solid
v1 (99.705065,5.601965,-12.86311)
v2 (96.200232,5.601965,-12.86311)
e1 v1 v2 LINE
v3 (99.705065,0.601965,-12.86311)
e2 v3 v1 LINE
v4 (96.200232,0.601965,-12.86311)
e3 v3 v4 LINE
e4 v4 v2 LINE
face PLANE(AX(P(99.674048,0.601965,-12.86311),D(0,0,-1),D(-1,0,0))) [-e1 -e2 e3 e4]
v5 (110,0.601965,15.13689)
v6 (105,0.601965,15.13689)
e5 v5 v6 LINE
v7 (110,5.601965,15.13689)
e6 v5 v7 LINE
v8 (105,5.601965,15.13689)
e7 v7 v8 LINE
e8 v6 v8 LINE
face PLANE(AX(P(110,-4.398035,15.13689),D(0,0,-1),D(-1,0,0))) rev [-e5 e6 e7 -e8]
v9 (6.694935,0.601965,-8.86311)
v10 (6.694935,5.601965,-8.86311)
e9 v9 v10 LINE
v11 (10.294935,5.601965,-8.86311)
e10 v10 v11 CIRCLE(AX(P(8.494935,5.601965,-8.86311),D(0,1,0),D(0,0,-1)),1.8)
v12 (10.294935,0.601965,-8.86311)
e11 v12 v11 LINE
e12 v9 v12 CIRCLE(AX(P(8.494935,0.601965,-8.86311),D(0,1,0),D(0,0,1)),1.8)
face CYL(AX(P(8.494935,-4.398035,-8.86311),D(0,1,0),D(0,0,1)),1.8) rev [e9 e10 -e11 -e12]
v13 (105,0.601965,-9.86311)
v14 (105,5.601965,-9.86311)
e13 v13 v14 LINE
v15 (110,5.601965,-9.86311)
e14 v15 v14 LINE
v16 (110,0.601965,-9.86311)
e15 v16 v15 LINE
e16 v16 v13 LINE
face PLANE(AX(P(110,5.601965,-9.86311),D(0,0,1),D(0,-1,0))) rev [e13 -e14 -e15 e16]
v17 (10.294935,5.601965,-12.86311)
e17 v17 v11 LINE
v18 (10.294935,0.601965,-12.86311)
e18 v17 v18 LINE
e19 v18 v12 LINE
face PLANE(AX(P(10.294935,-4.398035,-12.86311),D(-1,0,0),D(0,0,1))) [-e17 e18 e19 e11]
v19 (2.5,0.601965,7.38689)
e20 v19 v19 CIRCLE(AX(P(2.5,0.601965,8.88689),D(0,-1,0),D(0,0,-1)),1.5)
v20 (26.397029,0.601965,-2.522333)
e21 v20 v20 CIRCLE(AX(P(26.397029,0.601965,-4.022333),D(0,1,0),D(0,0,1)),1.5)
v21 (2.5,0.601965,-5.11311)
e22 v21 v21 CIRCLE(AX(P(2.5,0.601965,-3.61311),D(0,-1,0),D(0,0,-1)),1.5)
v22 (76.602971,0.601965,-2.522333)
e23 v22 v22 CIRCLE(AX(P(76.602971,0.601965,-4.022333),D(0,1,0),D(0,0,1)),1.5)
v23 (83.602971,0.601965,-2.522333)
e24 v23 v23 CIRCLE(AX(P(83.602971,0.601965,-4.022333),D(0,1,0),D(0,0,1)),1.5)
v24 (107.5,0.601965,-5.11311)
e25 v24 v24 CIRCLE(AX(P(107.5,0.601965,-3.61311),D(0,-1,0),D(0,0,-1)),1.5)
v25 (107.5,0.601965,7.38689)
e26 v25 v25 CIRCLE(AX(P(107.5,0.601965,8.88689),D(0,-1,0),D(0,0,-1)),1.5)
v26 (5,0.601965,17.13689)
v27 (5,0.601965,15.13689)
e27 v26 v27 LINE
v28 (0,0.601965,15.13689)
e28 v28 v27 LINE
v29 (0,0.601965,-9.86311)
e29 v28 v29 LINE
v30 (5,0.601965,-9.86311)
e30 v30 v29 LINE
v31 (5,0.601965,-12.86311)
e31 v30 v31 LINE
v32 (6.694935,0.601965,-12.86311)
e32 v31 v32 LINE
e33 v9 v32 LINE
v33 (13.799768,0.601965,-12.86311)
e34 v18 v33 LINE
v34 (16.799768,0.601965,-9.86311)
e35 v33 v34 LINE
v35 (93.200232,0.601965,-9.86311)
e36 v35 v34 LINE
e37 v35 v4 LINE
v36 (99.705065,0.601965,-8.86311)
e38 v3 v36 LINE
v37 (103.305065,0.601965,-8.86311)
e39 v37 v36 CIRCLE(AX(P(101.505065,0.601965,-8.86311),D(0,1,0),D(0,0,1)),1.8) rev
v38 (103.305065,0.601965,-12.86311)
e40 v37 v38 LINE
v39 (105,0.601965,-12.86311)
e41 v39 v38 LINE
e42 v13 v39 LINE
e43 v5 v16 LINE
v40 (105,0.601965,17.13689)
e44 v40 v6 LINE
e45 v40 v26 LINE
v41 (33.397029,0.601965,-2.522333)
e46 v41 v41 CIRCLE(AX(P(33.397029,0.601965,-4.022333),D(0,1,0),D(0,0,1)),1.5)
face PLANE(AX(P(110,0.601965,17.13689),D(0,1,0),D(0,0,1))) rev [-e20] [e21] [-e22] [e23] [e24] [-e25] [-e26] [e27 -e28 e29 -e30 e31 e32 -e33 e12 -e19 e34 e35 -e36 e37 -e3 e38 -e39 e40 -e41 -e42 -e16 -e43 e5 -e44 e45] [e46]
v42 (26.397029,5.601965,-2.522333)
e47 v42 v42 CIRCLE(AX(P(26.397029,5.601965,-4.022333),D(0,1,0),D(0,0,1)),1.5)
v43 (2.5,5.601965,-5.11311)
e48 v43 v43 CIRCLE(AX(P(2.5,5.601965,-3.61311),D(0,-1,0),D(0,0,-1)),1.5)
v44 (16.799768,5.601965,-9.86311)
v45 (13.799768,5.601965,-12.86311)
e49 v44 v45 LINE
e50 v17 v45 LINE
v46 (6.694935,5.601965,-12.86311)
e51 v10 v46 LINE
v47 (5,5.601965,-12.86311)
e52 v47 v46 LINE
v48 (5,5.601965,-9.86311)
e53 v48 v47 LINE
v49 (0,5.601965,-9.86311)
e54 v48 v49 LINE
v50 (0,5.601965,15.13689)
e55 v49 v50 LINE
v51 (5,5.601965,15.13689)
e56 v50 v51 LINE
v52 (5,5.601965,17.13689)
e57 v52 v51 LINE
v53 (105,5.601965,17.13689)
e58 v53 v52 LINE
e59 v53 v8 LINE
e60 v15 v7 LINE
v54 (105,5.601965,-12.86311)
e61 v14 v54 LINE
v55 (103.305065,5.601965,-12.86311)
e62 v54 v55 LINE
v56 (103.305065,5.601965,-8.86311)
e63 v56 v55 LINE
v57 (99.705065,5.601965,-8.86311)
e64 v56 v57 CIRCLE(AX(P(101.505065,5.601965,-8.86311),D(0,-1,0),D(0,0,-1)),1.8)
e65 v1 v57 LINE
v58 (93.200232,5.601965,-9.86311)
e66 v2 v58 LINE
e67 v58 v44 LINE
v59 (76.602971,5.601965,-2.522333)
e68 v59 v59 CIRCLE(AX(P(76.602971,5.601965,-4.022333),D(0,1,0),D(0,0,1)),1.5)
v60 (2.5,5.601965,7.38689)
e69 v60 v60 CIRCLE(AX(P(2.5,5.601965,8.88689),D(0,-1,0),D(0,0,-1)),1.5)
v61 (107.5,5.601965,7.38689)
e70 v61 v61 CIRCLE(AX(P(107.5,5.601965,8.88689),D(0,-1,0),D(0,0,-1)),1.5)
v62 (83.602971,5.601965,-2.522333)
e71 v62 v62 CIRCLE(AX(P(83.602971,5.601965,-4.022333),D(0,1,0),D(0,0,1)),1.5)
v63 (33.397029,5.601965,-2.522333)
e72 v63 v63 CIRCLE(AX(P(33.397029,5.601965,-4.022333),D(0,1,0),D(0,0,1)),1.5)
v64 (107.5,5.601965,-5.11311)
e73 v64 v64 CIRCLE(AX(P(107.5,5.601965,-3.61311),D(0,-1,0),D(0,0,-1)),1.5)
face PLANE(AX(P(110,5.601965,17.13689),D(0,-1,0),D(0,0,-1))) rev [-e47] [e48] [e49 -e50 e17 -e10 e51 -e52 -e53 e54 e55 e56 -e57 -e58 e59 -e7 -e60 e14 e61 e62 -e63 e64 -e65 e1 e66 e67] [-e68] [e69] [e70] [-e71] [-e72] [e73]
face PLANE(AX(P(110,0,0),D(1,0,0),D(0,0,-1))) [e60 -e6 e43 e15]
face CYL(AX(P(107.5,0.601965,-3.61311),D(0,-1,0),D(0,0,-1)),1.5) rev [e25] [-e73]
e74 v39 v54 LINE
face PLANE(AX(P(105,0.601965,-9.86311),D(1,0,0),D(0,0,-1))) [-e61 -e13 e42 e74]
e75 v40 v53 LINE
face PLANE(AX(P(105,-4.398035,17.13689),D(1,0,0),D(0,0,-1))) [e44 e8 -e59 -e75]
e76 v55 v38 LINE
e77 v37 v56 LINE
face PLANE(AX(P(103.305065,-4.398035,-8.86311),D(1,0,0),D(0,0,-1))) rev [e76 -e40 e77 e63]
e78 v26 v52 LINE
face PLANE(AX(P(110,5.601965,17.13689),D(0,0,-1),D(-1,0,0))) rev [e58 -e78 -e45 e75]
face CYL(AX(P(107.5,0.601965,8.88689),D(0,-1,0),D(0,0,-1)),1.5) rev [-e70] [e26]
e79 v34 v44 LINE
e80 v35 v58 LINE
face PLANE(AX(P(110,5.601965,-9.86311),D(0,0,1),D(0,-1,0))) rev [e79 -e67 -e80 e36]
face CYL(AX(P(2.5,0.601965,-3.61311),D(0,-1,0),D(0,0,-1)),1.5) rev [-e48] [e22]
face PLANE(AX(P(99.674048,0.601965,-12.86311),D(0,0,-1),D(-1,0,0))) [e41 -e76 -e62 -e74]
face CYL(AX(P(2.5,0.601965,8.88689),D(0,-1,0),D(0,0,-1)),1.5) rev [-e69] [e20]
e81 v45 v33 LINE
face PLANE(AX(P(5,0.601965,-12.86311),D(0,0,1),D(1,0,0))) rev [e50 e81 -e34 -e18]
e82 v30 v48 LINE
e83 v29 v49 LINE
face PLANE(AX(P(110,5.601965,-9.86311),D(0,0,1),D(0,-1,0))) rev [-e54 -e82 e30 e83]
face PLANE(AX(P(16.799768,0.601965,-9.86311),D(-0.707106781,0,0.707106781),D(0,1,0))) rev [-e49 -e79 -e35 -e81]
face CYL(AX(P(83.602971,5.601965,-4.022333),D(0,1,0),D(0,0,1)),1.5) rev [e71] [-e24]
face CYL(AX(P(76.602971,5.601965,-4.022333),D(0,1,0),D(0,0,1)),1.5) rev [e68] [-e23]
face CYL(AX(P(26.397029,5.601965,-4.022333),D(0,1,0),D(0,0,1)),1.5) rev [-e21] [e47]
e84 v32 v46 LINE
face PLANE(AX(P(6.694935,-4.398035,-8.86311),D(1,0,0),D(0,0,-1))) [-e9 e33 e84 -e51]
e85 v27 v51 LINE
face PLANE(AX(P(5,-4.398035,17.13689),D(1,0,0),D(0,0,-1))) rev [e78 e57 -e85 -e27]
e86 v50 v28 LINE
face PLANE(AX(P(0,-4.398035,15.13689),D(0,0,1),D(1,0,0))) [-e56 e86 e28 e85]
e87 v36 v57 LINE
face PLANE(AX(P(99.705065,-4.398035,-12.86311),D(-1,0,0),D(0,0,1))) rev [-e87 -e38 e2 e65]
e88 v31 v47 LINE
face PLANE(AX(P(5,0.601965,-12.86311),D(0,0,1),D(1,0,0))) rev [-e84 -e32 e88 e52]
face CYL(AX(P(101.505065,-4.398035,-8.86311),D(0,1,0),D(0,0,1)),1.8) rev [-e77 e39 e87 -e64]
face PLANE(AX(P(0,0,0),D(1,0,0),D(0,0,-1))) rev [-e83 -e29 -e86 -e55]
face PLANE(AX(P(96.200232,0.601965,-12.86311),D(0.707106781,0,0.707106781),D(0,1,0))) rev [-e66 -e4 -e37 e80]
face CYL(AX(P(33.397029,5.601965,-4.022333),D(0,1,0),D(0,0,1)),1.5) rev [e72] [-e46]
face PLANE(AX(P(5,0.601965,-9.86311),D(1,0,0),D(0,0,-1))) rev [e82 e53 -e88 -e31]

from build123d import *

# Parameters (mm, degrees)
SKETCH1_W                      = 27
SKETCH1_H                      = 5
BOSS_EXTRUDE1_DEPTH            = 110
M3_TAPPED_HOLE1_AT_2_COUNT     = 2
M3_TAPPED_HOLE1_AT_2_PITCH     = 7
SKETCH6_W                      = 5
SKETCH6_H                      = 2
CUT_EXTRUDE1_DEPTH             = 10
BOSS_EXTRUDE2_DEPTH            = 5
CUT_EXTRUDE3_DEPTH             = 10
CHAMFER1_SIZE                  = 3
CHAMFER1_OF_MIRROR8_SIZE       = 3
F_3_0MM_DOWEL_HOLE1_AT_2_COUNT = 2
F_3_0MM_DOWEL_HOLE1_AT_2_PITCH = 12.5


with BuildPart() as part:
    # Sketch1 → Boss-Extrude1 (new body)
    with BuildSketch(Plane(origin=(0, 0, 0), x_dir=(0, 0, -1), z_dir=(1, 0, 0))):
        with Locations((-3.636889684, 3.101965352)):
            Rectangle(SKETCH1_W, SKETCH1_H)
    extrude(amount=BOSS_EXTRUDE1_DEPTH)

    # Sketch14 → M3 Tapped Hole1 (revolve, cut)
    with BuildSketch(Plane(origin=(26.397029049, 5.601965352, -4.022332737), x_dir=(0, 0, 1), z_dir=(1, 0, 0))):
        Polygon((0, 0), (0, 8.251075774), (1.25, 7.5), (1.25, 6), (1.5, 6), (1.5, 0), align=None)
    m3_tapped_hole1 = revolve(axis=Axis((26.397029049, 11.951965352, -4.022332737), (0, -1, 0)), mode=Mode.SUBTRACT)

    # M3 Tapped Hole1 at 2: M3 Tapped Hole1 ×2
    with Locations(*[(i * M3_TAPPED_HOLE1_AT_2_PITCH, 0, 0) for i in range(1, M3_TAPPED_HOLE1_AT_2_COUNT)]):
        add(m3_tapped_hole1, mode=Mode.SUBTRACT)

    # Mirror3: M3 Tapped Hole1 across plane
    add(m3_tapped_hole1.mirror(Plane(origin=(55, 0, 0), x_dir=(0, 0, 1), z_dir=(1, 0, 0))), mode=Mode.SUBTRACT)

    # Mirror3 copy 1 sketch → Mirror3 copy 1 (revolve, cut)
    with BuildSketch(Plane(origin=(76.602970951, 5.601965352, -4.022332737), x_dir=(0, 0, 1), z_dir=(-1, 0, 0))):
        Polygon((0, 0), (0, -8.251075774), (1.25, -7.5), (1.25, -6), (1.5, -6), (1.5, 0), align=None)
    revolve(axis=Axis((76.602970951, 11.951965352, -4.022332737), (0, 1, 0)), mode=Mode.SUBTRACT)

    # Sketch6 → Cut-Extrude1 (cut)
    with BuildSketch(Plane(origin=(0, 5.601965352, 0), x_dir=(1, 0, 0), z_dir=(0, 1, 0))):
        with Locations((2.5, -16.136889684)):
            Rectangle(SKETCH6_W, SKETCH6_H)
    cut_extrude1 = extrude(amount=-CUT_EXTRUDE1_DEPTH, mode=Mode.SUBTRACT)

    # Mirror4: Cut-Extrude1 across plane
    add(cut_extrude1.mirror(Plane(origin=(55, 0, 0), x_dir=(0, 0, 1), z_dir=(1, 0, 0))), mode=Mode.SUBTRACT)

    # Sketch17 → Boss-Extrude2 (add)
    with BuildSketch(Plane(origin=(0, 5.601965352, 0), x_dir=(1, 0, 0), z_dir=(0, 1, 0))):
        Polygon((105, 9.863110316), (105, 12.863110316), (103.25, 12.863110316), (99.674047562, 12.863110316), (93.200232163, 12.863110316), (93.200232163, 9.863110316), (97.924047562, 9.863110316), align=None)
    boss_extrude2 = extrude(amount=-BOSS_EXTRUDE2_DEPTH)

    # Sketch22 → Cut-Extrude3 (cut)
    with BuildSketch(Plane(origin=(0, 5.601965352, 0), x_dir=(1, 0, 0), z_dir=(0, 1, 0))):
        with BuildLine():
            Line((101.505065332, 12.863110316), (103.305065332, 12.863110316))
            Line((103.305065332, 12.863110316), (103.305065332, 8.863110316))
            ThreePointArc((103.305065332, 8.863110316), (101.505065332, 7.063110316), (99.705065332, 8.863110316))
            Line((99.705065332, 8.863110316), (99.705065332, 12.863110316))
            Line((99.705065332, 12.863110316), (101.505065332, 12.863110316))
        make_face()
    cut_extrude3 = extrude(amount=-CUT_EXTRUDE3_DEPTH, mode=Mode.SUBTRACT)

    # Chamfer1
    chamfer1_edges = [part.edges().sort_by_distance(p)[0] for p in [
        (93.200232163, 3.101965352, -12.863110316),
    ]]
    chamfer(chamfer1_edges, length=CHAMFER1_SIZE - 0.0001)  # a hair under: the kernel refuses the full size

    # Mirror8: Boss-Extrude2, Cut-Extrude3 across plane
    add(boss_extrude2.mirror(Plane.ZY.offset(-55)))
    add(cut_extrude3.mirror(Plane.ZY.offset(-55)), mode=Mode.SUBTRACT)

    # Chamfer1 of Mirror8
    chamfer1_of_mirror8_edges = [part.edges().sort_by_distance(p)[0] for p in [
        (16.799767837, 3.101965352, -12.863110316),
    ]]
    chamfer(chamfer1_of_mirror8_edges, length=CHAMFER1_OF_MIRROR8_SIZE - 0.0001)  # a hair under: the kernel refuses the full size

    # Sketch24 → Ø3.0mm Dowel Hole1 (revolve, cut)
    with BuildSketch(Plane(origin=(107.5, 0.601965352, -3.613110316), x_dir=(0, 0, -1), z_dir=(1, 0, 0))):
        Polygon((0, 0), (0, 20.901290929), (1.5, 20), (1.5, 0), align=None)
    f_3_0mm_dowel_hole1 = revolve(axis=Axis((107.5, -5.748034648, -3.613110316), (0, 1, 0)), mode=Mode.SUBTRACT)

    # Ø3.0mm Dowel Hole1 at 2: Ø3.0mm Dowel Hole1 ×2
    with Locations(*[(0, 0, i * F_3_0MM_DOWEL_HOLE1_AT_2_PITCH) for i in range(1, F_3_0MM_DOWEL_HOLE1_AT_2_COUNT)]):
        add(f_3_0mm_dowel_hole1, mode=Mode.SUBTRACT)

    # Mirror9: Ø3.0mm Dowel Hole1 across plane
    add(f_3_0mm_dowel_hole1.mirror(Plane.ZY.offset(-55)), mode=Mode.SUBTRACT)

    # Mirror9 copy 1 sketch → Mirror9 copy 1 (revolve, cut)
    with BuildSketch(Plane(origin=(2.5, 0.601965352, 8.886889684), x_dir=(0, 0, -1), z_dir=(-1, 0, 0))):
        Polygon((0, 0), (0, -20.901290929), (1.5, -20), (1.5, 0), align=None)
    revolve(axis=Axis((2.5, -5.748034648, 8.886889684), (0, -1, 0)), mode=Mode.SUBTRACT)


solid = part.part
